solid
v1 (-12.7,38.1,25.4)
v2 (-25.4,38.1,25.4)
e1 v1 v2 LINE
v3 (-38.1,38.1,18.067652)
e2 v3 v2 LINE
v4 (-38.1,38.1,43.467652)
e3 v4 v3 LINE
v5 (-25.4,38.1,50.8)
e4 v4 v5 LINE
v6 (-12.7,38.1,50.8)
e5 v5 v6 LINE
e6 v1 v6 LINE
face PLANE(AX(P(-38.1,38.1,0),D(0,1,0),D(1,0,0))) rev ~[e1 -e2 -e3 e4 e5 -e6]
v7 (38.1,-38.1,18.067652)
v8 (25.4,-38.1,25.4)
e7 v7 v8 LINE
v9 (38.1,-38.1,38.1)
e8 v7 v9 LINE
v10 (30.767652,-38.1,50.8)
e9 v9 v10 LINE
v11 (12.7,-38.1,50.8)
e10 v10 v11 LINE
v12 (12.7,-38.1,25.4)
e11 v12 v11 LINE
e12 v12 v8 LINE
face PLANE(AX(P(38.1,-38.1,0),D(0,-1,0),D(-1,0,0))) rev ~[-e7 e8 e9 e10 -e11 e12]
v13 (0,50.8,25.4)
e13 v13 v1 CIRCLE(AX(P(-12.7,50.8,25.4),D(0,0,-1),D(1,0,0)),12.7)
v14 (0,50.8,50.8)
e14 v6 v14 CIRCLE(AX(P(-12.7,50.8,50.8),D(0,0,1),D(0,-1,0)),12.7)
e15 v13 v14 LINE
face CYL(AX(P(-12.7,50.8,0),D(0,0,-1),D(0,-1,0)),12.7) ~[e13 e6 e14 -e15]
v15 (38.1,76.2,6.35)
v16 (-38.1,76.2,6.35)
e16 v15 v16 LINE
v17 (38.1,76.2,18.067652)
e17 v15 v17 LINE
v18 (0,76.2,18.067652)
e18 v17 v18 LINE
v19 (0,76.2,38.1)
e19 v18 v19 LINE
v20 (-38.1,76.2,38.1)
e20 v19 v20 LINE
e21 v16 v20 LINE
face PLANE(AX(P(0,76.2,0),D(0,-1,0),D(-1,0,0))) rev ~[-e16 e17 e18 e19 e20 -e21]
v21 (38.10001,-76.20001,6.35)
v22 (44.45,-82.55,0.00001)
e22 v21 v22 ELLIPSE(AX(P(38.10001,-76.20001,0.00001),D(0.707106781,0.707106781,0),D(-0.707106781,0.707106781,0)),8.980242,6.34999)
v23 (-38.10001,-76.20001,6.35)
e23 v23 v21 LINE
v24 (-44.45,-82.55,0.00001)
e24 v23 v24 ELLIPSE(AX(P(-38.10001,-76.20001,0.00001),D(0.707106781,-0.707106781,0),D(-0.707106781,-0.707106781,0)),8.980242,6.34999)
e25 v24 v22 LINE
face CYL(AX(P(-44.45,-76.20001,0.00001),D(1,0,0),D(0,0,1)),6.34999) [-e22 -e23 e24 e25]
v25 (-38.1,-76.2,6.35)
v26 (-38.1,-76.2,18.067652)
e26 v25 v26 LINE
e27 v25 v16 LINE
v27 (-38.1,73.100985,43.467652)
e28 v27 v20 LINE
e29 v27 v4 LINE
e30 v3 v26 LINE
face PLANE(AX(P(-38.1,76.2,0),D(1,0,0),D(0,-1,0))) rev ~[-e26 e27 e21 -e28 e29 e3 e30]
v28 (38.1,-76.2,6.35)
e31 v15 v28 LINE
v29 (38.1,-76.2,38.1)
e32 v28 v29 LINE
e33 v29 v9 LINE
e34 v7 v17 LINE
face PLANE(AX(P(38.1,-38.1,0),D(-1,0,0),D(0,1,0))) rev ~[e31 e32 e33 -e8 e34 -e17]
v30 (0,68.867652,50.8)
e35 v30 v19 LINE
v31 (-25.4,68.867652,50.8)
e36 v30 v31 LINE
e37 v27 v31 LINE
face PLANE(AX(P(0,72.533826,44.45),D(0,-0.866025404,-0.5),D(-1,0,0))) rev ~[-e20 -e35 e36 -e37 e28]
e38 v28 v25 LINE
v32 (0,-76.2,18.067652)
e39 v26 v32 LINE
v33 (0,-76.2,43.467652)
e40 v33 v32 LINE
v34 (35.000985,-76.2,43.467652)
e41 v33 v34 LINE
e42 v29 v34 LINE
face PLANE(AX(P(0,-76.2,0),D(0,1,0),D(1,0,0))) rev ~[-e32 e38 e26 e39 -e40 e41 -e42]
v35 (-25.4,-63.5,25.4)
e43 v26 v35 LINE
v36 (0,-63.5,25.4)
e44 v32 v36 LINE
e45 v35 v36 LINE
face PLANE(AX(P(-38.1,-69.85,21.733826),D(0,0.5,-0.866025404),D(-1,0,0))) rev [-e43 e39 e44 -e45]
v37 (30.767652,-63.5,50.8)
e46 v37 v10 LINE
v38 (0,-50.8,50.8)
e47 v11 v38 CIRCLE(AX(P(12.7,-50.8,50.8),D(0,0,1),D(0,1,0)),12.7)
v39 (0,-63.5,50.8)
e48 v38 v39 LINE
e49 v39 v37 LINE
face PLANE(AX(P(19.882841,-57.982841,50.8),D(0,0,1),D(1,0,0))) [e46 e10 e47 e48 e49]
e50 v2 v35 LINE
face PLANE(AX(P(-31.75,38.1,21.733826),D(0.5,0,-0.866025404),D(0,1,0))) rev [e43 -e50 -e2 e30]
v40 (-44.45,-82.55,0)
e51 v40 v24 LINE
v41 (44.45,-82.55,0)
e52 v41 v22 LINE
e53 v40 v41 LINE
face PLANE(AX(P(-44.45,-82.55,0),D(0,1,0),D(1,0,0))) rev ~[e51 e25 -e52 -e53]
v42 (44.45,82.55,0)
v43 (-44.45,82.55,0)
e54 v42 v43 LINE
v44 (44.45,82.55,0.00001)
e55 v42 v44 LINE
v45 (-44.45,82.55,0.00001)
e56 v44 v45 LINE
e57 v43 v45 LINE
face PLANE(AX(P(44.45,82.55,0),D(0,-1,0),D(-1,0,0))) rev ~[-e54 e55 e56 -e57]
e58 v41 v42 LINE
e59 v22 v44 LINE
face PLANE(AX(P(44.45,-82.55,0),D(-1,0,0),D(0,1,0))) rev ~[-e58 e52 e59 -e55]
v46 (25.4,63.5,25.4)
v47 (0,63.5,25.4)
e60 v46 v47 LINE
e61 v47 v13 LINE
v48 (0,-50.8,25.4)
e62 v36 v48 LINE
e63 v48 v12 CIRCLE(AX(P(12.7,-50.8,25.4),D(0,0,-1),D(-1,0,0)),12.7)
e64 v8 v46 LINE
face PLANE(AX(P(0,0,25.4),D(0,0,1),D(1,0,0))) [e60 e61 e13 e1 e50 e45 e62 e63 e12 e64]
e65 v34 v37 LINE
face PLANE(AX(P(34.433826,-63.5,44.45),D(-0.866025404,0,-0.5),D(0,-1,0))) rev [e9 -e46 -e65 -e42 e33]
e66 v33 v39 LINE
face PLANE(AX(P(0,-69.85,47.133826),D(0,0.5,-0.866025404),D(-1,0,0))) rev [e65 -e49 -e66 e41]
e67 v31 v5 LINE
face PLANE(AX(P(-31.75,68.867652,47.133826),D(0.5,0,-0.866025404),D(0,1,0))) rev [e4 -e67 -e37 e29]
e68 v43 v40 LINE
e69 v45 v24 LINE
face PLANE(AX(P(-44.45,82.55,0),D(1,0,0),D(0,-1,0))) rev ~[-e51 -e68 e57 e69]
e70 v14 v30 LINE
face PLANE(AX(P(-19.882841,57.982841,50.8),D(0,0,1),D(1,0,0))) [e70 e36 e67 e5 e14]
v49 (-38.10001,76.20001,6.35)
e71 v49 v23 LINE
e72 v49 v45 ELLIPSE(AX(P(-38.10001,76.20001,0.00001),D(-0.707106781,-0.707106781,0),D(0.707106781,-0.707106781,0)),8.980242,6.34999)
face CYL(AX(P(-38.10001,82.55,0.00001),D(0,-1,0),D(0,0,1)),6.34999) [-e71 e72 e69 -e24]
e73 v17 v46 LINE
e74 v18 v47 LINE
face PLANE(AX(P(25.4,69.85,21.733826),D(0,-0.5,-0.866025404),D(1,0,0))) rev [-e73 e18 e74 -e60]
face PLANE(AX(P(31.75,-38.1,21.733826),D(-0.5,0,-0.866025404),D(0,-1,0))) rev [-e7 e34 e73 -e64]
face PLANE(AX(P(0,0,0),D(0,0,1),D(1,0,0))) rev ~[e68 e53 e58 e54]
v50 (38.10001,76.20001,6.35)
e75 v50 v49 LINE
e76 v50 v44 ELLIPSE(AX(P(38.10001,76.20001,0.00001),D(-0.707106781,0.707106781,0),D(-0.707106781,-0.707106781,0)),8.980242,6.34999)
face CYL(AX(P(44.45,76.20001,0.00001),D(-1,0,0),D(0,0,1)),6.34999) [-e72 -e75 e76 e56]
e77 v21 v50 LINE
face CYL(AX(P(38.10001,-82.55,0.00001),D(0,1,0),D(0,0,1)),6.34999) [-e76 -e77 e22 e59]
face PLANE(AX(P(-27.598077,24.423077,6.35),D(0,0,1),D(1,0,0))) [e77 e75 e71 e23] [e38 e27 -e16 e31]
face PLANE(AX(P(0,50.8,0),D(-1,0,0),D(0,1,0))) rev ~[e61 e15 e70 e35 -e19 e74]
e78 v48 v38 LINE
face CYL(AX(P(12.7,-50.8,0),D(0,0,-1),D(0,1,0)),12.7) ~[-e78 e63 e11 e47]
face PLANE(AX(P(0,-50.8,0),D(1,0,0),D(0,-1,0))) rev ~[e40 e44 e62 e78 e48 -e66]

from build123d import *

# Parameters (mm, degrees)
F1_DEPTH    = 6.35
F2_DEPTH    = 25.4
F3_DEPTH    = 50.8
F4_C1_SIZE2 = 12.7
F4_C1_SIZE  = 7.3323484187
F4_C2_SIZE2 = 12.7
F4_C2_SIZE  = 7.3323484187
F4_C3_SIZE2 = 7.3323484187
F4_C3_SIZE  = 12.7
F4_C4_SIZE2 = 12.7
F4_C4_SIZE  = 7.3323484187
F4_C5_SIZE2 = 12.7
F4_C5_SIZE  = 7.3323484187
F4_C6_SIZE2 = 12.7
F4_C6_SIZE  = 7.3323484187
F4_C7_SIZE2 = 12.7
F4_C7_SIZE  = 7.3323484187
F4_C8_SIZE2 = 12.7
F4_C8_SIZE  = 7.3323484187
F5_R        = 6.34999


# Not quite as in the source:
# - a fillet or chamfer is up to 0.001 mm smaller than in the source, because OpenCascade refuses the exact size


with BuildPart() as f1:
    # F0 (on Top) → F1 (new body)
    with BuildSketch(Plane.XY):
        Polygon((-38.1, 38.1), (-38.1, 76.2), (0, 76.2), (38.1, 76.2), (38.1, 82.55), (-44.45, 82.55), (-44.45, -82.55), (-38.1, -82.55), (-38.1, -76.2), align=None)
        Polygon((38.1, 82.55), (38.1, 76.2), (38.1, -38.1), (38.1, -76.2), (0, -76.2), (-38.1, -76.2), (-38.1, -82.55), (44.45, -82.55), (44.45, 82.55), align=None)
    extrude(amount=F1_DEPTH)

    # F0 (on Top) → F2 (join)
    with BuildSketch(Plane.XY):
        with BuildLine():
            Line((38.1, 76.2), (0, 76.2))
            Line((0, 76.2), (0, 50.8))
            ThreePointArc((0, 50.8), (-3.7197438789, 41.8197438789), (-12.7, 38.1))
            Line((-12.7, 38.1), (-38.1, 38.1))
            Line((-38.1, 38.1), (-38.1, -76.2))
            Line((-38.1, -76.2), (0, -76.2))
            Line((0, -76.2), (0, -50.8))
            ThreePointArc((0, -50.8), (3.7197438789, -41.8197438789), (12.7, -38.1))
            Line((12.7, -38.1), (38.1, -38.1))
            Line((38.1, -38.1), (38.1, 76.2))
        make_face()
    extrude(amount=F2_DEPTH)

    # F0 (on Top) → F3 (join)
    with BuildSketch(Plane.XY):
        with BuildLine():
            Line((0, 76.2), (-38.1, 76.2))
            Line((-38.1, 76.2), (-38.1, 38.1))
            Line((-38.1, 38.1), (-12.7, 38.1))
            ThreePointArc((-12.7, 38.1), (-3.7197438789, 41.8197438789), (0, 50.8))
            Line((0, 50.8), (0, 76.2))
        make_face()
        with BuildLine():
            Line((38.1, -76.2), (38.1, -38.1))
            Line((38.1, -38.1), (12.7, -38.1))
            ThreePointArc((12.7, -38.1), (3.7197438789, -41.8197438789), (0, -50.8))
            Line((0, -50.8), (0, -76.2))
            Line((0, -76.2), (38.1, -76.2))
        make_face()
    extrude(amount=F3_DEPTH)

    # F4: chamfer of 12.7 x 7.3323484187 on 8 edges, made by hand

    # F4_c1
    f4_c1_edges = [f1.edges().sort_by_distance(p)[0] for p in [
        (-19.05, -76.2, 25.4),
    ]]
    f4_c1_side = f1.faces().sort_by_distance((-19.05, -76.2, 25.2533530316))[0]
    chamfer(f4_c1_edges, length=F4_C1_SIZE, length2=F4_C1_SIZE2, reference=f4_c1_side)

    # F4_c2
    f4_c2_edges = [f1.edges().sort_by_distance(p)[0] for p in [
        (19.05, -76.2, 50.8),
    ]]
    f4_c2_side = f1.faces().sort_by_distance((19.05, -76.2, 50.6533530316))[0]
    chamfer(f4_c2_edges, length=F4_C2_SIZE, length2=F4_C2_SIZE2, reference=f4_c2_side)

    # F4_c3
    f4_c3_edges = [f1.edges().sort_by_distance(p)[0] for p in [
        (38.1, -50.8, 50.8),
    ]]
    f4_c3_side = f1.faces().sort_by_distance((38.1, -50.8, 50.6533530316))[0]
    chamfer(f4_c3_edges, length=F4_C3_SIZE, length2=F4_C3_SIZE2, reference=f4_c3_side)

    # F4_c4
    f4_c4_edges = [f1.edges().sort_by_distance(p)[0] for p in [
        (38.1, 19.05, 25.4),
    ]]
    f4_c4_side = f1.faces().sort_by_distance((38.1, 19.05, 25.2533530316))[0]
    chamfer(f4_c4_edges, length=F4_C4_SIZE, length2=F4_C4_SIZE2, reference=f4_c4_side)

    # F4_c5
    f4_c5_edges = [f1.edges().sort_by_distance(p)[0] for p in [
        (12.7, 76.2, 25.4),
    ]]
    f4_c5_side = f1.faces().sort_by_distance((12.7, 76.2, 25.2533530316))[0]
    chamfer(f4_c5_edges, length=F4_C5_SIZE, length2=F4_C5_SIZE2, reference=f4_c5_side)

    # F4_c6
    f4_c6_edges = [f1.edges().sort_by_distance(p)[0] for p in [
        (-38.1, -12.7, 25.4),
    ]]
    f4_c6_side = f1.faces().sort_by_distance((-38.1, -12.7, 25.2533530316))[0]
    chamfer(f4_c6_edges, length=F4_C6_SIZE, length2=F4_C6_SIZE2, reference=f4_c6_side)

    # F4_c7
    f4_c7_edges = [f1.edges().sort_by_distance(p)[0] for p in [
        (-19.05, 76.2, 50.8),
    ]]
    f4_c7_side = f1.faces().sort_by_distance((-19.05, 76.0533530316, 50.8))[0]
    chamfer(f4_c7_edges, length=F4_C7_SIZE, length2=F4_C7_SIZE2, reference=f4_c7_side)

    # F4_c8
    f4_c8_edges = [f1.edges().sort_by_distance(p)[0] for p in [
        (-38.1, 53.4838257906, 50.8),
    ]]
    f4_c8_side = f1.faces().sort_by_distance((-38.1, 53.4838257906, 50.6533530316))[0]
    chamfer(f4_c8_edges, length=F4_C8_SIZE, length2=F4_C8_SIZE2, reference=f4_c8_side)

    # F5 (radius 6.35 in the source; OpenCascade refuses exactly that, so slightly less here)
    f5_edges = [f1.edges().sort_by_distance(p)[0] for p in [
        (-44.45, 0, 6.35),
        (0, 82.55, 6.35),
        (44.45, 0, 6.35),
        (0, -82.55, 6.35),
    ]]
    fillet(f5_edges, radius=F5_R)


solid = f1.part
